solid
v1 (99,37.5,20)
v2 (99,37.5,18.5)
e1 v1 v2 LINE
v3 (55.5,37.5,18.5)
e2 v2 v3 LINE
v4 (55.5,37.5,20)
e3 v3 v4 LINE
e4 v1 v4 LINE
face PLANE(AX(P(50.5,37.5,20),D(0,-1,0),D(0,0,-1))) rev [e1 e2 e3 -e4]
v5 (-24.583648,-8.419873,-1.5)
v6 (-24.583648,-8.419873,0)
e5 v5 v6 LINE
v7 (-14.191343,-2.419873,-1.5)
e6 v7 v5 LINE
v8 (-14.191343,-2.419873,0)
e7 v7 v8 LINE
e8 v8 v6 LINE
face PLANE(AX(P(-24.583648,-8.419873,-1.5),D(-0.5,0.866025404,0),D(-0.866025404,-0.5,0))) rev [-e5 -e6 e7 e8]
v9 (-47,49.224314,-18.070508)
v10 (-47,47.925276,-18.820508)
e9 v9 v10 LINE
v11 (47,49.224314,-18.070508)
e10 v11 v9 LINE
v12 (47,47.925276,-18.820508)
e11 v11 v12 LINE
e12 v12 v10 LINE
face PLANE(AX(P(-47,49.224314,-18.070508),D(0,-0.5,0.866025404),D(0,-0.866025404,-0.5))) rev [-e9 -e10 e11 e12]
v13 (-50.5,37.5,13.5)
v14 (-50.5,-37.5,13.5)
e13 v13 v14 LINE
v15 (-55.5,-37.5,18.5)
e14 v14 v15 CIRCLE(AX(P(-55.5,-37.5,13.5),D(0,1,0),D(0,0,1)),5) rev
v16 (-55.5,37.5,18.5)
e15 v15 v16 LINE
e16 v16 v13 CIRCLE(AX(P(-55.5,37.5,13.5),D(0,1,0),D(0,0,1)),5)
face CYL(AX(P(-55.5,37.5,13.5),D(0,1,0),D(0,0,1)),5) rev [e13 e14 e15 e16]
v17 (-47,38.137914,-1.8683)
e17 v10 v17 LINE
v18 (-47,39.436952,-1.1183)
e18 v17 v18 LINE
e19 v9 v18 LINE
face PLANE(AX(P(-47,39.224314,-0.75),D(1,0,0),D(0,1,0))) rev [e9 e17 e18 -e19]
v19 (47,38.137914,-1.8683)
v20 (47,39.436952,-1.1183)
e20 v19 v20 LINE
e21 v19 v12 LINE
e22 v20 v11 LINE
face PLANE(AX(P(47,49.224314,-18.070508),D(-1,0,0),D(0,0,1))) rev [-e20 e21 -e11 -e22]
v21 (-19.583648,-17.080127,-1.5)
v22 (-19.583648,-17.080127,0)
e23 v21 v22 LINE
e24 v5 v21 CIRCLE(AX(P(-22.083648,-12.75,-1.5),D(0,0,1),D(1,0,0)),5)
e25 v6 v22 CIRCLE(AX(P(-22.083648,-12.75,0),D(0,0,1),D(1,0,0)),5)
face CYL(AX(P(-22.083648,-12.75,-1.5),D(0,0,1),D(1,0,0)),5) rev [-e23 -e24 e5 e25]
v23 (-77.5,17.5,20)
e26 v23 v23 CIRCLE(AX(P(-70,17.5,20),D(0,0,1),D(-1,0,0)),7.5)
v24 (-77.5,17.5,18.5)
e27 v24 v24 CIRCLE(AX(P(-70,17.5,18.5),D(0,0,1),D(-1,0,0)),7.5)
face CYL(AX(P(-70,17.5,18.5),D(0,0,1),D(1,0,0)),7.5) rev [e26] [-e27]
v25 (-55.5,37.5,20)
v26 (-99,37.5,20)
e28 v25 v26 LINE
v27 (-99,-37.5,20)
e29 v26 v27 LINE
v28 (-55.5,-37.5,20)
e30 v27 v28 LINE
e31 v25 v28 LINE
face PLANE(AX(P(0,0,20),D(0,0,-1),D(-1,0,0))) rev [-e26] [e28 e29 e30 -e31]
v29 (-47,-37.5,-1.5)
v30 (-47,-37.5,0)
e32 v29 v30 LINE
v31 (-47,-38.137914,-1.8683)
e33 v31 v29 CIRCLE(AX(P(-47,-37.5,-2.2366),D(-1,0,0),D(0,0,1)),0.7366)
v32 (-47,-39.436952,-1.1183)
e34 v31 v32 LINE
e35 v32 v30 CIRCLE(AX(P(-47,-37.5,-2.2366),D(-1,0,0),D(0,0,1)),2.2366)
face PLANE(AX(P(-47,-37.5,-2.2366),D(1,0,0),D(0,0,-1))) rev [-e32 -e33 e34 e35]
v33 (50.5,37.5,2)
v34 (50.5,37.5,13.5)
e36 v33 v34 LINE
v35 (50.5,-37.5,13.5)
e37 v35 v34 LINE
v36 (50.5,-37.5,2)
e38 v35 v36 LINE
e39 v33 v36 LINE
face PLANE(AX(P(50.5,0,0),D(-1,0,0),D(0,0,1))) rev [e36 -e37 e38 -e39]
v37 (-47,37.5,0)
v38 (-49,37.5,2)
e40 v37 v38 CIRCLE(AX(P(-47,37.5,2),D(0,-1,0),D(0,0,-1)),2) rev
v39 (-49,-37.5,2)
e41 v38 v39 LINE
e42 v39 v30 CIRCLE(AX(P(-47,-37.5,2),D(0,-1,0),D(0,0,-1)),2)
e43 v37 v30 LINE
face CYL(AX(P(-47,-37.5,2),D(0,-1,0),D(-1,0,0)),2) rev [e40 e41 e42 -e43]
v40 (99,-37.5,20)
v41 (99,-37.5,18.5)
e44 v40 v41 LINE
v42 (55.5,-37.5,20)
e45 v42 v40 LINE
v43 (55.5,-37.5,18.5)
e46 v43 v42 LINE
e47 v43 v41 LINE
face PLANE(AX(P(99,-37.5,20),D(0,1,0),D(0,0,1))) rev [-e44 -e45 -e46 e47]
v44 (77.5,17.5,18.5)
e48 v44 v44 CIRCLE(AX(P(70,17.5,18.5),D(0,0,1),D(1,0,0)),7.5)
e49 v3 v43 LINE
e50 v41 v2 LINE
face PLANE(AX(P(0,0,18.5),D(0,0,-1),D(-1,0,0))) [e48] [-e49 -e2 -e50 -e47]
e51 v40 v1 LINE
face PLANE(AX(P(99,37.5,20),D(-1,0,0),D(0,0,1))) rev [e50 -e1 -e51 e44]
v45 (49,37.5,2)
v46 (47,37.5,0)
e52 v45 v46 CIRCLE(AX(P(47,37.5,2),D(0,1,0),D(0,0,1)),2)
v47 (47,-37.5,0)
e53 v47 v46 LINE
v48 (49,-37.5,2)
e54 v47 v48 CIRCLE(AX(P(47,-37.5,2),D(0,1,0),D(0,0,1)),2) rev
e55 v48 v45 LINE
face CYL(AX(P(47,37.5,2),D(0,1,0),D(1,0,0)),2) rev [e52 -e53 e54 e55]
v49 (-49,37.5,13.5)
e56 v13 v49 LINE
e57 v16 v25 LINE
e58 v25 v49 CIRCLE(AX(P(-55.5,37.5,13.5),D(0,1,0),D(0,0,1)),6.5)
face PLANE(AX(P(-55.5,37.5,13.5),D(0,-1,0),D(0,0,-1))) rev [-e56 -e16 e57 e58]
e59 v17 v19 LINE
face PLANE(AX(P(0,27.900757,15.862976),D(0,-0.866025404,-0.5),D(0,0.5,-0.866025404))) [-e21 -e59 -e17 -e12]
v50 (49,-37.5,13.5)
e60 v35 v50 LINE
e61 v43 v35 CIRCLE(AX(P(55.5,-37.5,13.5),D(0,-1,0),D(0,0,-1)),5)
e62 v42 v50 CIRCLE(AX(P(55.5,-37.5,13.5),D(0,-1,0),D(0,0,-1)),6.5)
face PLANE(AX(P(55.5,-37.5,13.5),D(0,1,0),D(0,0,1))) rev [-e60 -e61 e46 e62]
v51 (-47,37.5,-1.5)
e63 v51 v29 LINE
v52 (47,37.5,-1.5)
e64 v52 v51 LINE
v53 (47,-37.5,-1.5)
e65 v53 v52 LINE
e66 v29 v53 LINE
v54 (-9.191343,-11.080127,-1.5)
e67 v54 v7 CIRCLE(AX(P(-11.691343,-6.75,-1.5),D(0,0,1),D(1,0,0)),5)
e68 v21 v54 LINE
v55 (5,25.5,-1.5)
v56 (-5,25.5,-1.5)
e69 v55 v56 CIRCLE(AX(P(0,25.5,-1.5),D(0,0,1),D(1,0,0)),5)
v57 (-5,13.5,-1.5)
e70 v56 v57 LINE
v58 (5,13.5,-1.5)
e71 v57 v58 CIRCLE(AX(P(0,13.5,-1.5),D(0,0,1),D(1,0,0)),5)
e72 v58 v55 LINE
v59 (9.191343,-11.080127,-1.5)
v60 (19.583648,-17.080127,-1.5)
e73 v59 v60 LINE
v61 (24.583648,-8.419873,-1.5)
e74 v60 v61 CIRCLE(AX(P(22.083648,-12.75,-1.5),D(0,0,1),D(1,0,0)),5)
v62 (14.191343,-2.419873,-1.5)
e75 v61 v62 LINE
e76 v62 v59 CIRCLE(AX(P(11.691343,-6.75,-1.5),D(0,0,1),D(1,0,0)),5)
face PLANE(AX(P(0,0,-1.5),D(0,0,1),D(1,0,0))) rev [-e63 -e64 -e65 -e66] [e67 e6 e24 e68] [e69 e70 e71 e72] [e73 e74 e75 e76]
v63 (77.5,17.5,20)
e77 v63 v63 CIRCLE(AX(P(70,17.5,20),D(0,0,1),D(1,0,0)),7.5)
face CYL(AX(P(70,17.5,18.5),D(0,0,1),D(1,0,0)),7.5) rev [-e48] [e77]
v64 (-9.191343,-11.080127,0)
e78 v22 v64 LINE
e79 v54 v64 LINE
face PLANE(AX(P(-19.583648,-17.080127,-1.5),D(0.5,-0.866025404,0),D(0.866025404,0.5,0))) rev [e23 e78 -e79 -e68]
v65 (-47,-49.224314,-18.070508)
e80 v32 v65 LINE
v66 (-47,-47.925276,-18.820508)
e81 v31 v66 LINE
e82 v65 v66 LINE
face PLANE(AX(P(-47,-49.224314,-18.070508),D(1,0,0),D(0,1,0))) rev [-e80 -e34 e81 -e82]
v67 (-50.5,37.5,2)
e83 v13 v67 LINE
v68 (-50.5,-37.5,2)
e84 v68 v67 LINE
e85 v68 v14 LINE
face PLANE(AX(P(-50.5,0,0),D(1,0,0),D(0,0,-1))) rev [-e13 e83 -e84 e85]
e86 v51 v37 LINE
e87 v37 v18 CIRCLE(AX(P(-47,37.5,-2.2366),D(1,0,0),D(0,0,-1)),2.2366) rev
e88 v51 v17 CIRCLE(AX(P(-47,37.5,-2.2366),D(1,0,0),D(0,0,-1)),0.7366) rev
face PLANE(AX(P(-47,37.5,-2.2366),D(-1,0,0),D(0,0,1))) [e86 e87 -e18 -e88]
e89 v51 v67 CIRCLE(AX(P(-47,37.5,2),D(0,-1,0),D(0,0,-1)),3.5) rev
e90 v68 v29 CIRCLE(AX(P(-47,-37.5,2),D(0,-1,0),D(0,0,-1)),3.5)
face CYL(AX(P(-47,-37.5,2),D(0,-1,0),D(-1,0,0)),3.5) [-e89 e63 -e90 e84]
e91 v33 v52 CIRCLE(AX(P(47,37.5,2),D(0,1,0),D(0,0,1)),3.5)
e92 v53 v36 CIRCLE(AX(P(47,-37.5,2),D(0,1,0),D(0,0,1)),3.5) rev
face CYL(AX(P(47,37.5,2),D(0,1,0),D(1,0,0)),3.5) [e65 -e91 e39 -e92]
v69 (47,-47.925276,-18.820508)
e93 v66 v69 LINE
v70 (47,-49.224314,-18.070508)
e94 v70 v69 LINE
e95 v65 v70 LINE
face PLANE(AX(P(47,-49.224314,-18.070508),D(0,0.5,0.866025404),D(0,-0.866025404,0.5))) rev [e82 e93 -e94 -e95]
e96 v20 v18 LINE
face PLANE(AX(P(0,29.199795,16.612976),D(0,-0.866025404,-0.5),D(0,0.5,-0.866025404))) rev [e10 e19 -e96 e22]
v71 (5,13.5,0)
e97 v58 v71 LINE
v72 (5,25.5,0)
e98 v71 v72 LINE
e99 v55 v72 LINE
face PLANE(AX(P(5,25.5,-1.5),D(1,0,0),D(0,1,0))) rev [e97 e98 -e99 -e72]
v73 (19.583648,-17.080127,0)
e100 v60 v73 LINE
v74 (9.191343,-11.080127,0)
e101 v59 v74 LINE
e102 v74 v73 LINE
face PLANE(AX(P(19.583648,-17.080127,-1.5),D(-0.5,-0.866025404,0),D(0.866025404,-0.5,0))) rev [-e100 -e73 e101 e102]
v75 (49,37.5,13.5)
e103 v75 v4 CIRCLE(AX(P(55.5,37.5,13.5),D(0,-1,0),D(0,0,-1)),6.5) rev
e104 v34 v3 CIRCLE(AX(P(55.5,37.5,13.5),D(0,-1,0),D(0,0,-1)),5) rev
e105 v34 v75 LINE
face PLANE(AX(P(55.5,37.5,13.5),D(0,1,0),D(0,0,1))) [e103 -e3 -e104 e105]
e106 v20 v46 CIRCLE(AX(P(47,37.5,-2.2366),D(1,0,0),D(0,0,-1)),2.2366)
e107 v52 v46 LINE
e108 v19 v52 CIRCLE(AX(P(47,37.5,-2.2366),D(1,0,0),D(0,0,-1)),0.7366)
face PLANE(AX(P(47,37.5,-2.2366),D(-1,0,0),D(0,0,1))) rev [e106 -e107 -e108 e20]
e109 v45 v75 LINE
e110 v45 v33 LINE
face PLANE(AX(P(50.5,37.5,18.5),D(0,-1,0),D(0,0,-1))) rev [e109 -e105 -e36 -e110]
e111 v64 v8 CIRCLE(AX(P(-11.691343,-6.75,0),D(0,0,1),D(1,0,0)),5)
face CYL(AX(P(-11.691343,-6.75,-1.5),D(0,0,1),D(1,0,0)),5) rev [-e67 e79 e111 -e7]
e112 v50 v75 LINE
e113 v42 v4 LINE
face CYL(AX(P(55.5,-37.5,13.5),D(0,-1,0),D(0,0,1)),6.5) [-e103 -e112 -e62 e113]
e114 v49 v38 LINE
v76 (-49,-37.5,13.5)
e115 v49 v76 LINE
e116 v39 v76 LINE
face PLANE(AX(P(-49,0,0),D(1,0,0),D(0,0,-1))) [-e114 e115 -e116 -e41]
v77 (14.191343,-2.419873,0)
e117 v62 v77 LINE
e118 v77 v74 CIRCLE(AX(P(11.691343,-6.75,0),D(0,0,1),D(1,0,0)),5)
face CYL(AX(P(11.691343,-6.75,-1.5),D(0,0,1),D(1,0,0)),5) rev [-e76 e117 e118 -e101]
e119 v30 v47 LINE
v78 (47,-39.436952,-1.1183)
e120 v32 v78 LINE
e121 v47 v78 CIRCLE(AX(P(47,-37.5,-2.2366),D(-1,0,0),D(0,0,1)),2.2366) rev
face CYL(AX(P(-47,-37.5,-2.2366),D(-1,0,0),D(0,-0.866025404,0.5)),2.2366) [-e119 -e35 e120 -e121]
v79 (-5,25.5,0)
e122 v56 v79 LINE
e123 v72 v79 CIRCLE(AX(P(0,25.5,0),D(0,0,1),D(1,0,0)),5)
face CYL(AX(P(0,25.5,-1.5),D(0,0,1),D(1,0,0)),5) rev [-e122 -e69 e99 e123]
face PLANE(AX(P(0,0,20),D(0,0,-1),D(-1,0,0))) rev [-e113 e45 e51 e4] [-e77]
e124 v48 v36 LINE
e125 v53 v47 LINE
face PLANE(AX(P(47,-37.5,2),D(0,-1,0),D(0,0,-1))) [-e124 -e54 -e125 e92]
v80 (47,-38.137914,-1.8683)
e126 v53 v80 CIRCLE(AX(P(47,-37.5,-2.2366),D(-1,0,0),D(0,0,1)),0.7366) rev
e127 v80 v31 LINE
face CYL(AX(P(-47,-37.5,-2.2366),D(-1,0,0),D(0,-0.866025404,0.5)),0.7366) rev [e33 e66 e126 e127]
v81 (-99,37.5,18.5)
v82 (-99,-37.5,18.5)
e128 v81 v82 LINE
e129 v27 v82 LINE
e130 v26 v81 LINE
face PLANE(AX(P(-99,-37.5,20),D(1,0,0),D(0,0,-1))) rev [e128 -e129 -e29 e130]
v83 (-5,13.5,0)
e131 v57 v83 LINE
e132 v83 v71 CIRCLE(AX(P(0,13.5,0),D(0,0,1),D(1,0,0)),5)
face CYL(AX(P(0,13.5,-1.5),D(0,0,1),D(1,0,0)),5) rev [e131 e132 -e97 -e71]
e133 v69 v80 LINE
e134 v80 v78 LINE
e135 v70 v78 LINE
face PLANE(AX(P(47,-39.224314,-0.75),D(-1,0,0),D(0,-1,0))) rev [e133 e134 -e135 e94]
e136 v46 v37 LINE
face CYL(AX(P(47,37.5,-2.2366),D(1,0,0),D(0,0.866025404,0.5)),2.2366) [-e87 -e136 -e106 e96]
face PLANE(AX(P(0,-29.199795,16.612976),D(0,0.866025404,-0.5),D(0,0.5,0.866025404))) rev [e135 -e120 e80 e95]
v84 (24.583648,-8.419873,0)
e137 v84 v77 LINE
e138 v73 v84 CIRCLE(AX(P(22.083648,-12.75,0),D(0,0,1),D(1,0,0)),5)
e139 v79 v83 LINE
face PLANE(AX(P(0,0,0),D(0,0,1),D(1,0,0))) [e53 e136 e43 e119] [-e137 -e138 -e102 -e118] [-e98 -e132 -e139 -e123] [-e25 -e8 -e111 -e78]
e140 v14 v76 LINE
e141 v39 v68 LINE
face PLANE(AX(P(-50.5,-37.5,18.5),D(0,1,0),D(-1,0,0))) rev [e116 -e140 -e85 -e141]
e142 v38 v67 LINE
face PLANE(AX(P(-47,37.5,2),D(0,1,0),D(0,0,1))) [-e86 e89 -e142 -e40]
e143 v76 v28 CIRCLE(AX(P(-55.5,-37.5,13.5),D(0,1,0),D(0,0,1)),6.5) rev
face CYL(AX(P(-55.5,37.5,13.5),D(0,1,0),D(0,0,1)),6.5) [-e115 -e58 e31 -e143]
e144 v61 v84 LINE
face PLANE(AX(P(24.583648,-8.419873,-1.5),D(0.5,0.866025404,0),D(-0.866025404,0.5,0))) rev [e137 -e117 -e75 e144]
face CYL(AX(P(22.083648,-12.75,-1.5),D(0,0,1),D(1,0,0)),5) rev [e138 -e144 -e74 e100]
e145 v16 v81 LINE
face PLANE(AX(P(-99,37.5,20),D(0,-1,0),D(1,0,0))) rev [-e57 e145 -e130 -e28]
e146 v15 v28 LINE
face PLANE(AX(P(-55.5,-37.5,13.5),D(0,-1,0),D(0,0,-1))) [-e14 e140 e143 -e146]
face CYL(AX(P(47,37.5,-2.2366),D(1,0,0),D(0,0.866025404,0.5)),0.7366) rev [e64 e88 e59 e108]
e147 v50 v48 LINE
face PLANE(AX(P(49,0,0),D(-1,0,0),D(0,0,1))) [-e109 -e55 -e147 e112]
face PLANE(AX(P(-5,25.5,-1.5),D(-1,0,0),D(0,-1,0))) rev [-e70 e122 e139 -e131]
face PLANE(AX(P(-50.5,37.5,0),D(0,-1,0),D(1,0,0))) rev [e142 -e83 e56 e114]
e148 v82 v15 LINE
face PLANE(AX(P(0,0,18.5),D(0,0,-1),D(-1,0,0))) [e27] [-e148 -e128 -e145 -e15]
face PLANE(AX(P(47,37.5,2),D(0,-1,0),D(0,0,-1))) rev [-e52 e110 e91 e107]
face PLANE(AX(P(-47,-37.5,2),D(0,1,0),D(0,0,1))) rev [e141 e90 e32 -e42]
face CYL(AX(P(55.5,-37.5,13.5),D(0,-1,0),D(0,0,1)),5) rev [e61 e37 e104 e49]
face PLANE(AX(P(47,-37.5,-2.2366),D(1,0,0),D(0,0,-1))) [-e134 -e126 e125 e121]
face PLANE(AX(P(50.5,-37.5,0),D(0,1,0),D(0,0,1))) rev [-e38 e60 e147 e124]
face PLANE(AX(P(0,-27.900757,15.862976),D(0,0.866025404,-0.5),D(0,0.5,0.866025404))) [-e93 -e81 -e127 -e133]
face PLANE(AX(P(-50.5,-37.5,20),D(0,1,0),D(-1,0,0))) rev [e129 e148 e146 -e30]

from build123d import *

# Parameters (mm, degrees)
SKETCH1_W                    = 94
SKETCH1_H                    = 75
BASE_FLANGE1_DEPTH           = 1.5
EDGE_FLANGE1_DEPTH           = 75
EDGE_FLANGE2_STRIP_W         = 16
EDGE_FLANGE2_STRIP_H         = 1.5
EDGE_FLANGE2_STRIP_CUT_DEPTH = 75
EDGE_FLANGE2_DEPTH           = 75
EDGE_FLANGE3_DEPTH           = 75
EDGE_FLANGE4_STRIP_W         = 16
EDGE_FLANGE4_STRIP_H         = 1.5
EDGE_FLANGE4_STRIP_CUT_DEPTH = 75
EDGE_FLANGE4_DEPTH           = 75
SKETCH18_R                   = 7.5
CUT_EXTRUDE1_DEPTH           = 10
EDGE_FLANGE5_DEPTH           = 94
EDGE_FLANGE6_DEPTH           = 94


# Sheet-metal steps are written as plain solids
with BuildPart() as part:
    # Sketch1 → Base-Flange1 (new body)
    with BuildSketch(Plane.XY):
        Rectangle(SKETCH1_W, SKETCH1_H)
        with BuildLine():
            Line((5, 25.5), (5, 13.5))
            ThreePointArc((5, 13.5), (0, 8.5), (-5, 13.5))
            Line((-5, 13.5), (-5, 25.5))
            ThreePointArc((-5, 25.5), (0, 30.5), (5, 25.5))
        make_face(mode=Mode.SUBTRACT)
        with BuildLine():
            Line((19.583647797, -17.080127019), (9.191342951, -11.080127019))
            ThreePointArc((9.191342951, -11.080127019), (7.361215932, -4.25), (14.191342951, -2.419872981))
            Line((14.191342951, -2.419872981), (24.583647797, -8.419872981))
            ThreePointArc((24.583647797, -8.419872981), (26.413774815, -15.25), (19.583647797, -17.080127019))
        make_face(mode=Mode.SUBTRACT)
        with BuildLine():
            Line((-24.583647797, -8.419872981), (-14.191342951, -2.419872981))
            ThreePointArc((-14.191342951, -2.419872981), (-7.361215932, -4.25), (-9.191342951, -11.080127019))
            Line((-9.191342951, -11.080127019), (-19.583647797, -17.080127019))
            ThreePointArc((-19.583647797, -17.080127019), (-26.413774815, -15.25), (-24.583647797, -8.419872981))
        make_face(mode=Mode.SUBTRACT)
    extrude(amount=-BASE_FLANGE1_DEPTH)

    # Edge-Flange1 section (across the edge) → Edge-Flange1 (add)
    with BuildSketch(Plane(origin=(49, -37.5, 0), x_dir=(-1, 0, 0), z_dir=(0, 1, 0))):
        with BuildLine():
            Line((-1.5, 2), (-1.5, 18.5))
            Line((-1.5, 18.5), (0, 18.5))
            Line((0, 18.5), (0, 2))
            ThreePointArc((0, 2), (0.585786438, 0.585786438), (2, 0))
            Line((2, 0), (2, -1.5))
            ThreePointArc((2, -1.5), (-0.474873734, -0.474873734), (-1.5, 2))
        make_face()
    extrude(amount=EDGE_FLANGE1_DEPTH)

    # Edge-Flange2 strip (across the edge) → Edge-Flange2 strip cut (cut)
    with BuildSketch(Plane(origin=(50.5, 37.5, 18.5), x_dir=(0, 0, -1), z_dir=(0, -1, 0))):
        with Locations((-3, -0.75)):
            Rectangle(EDGE_FLANGE2_STRIP_W, EDGE_FLANGE2_STRIP_H)
    extrude(amount=EDGE_FLANGE2_STRIP_CUT_DEPTH, mode=Mode.SUBTRACT)

    # Edge-Flange2 section (across the edge) → Edge-Flange2 (add)
    with BuildSketch(Plane(origin=(50.5, 37.5, 18.5), x_dir=(0, 0, -1), z_dir=(0, -1, 0))):
        with BuildLine():
            Line((-1.5, 5), (-1.5, 48.5))
            Line((-1.5, 48.5), (0, 48.5))
            Line((0, 48.5), (0, 5))
            ThreePointArc((0, 5), (1.464466094, 1.464466094), (5, 0))
            Line((5, 0), (5, -1.5))
            ThreePointArc((5, -1.5), (0.403805922, 0.403805922), (-1.5, 5))
        make_face()
    extrude(amount=EDGE_FLANGE2_DEPTH)

    # Edge-Flange3 section (across the edge) → Edge-Flange3 (add)
    with BuildSketch(Plane(origin=(-49, 37.5, 0), x_dir=(1, 0, 0), z_dir=(0, -1, 0))):
        with BuildLine():
            Line((-1.5, 2), (-1.5, 18.5))
            Line((-1.5, 18.5), (0, 18.5))
            Line((0, 18.5), (0, 2))
            ThreePointArc((0, 2), (0.585786438, 0.585786438), (2, 0))
            Line((2, 0), (2, -1.5))
            ThreePointArc((2, -1.5), (-0.474873734, -0.474873734), (-1.5, 2))
        make_face()
    extrude(amount=EDGE_FLANGE3_DEPTH)

    # Edge-Flange4 strip (across the edge) → Edge-Flange4 strip cut (cut)
    with BuildSketch(Plane(origin=(-50.5, -37.5, 18.5), x_dir=(0, 0, -1), z_dir=(0, 1, 0))):
        with Locations((-3, -0.75)):
            Rectangle(EDGE_FLANGE4_STRIP_W, EDGE_FLANGE4_STRIP_H)
    extrude(amount=EDGE_FLANGE4_STRIP_CUT_DEPTH, mode=Mode.SUBTRACT)

    # Edge-Flange4 section (across the edge) → Edge-Flange4 (add)
    with BuildSketch(Plane(origin=(-50.5, -37.5, 18.5), x_dir=(0, 0, -1), z_dir=(0, 1, 0))):
        with BuildLine():
            Line((-1.5, 5), (-1.5, 48.5))
            Line((-1.5, 48.5), (0, 48.5))
            Line((0, 48.5), (0, 5))
            ThreePointArc((0, 5), (1.464466094, 1.464466094), (5, 0))
            Line((5, 0), (5, -1.5))
            ThreePointArc((5, -1.5), (0.403805922, 0.403805922), (-1.5, 5))
        make_face()
    extrude(amount=EDGE_FLANGE4_DEPTH)

    # Sketch18 → Cut-Extrude1 (cut)
    with BuildSketch(Plane.XY.offset(20)):
        with Locations((70, 17.5)):
            Circle(SKETCH18_R)
        with Locations(Location((-70, 17.5, 0), (0, 0, 180))):
            Circle(SKETCH18_R)
    extrude(amount=-CUT_EXTRUDE1_DEPTH, mode=Mode.SUBTRACT)

    # Edge-Flange5 section (across the edge) → Edge-Flange5 (add)
    with BuildSketch(Plane(origin=(-47, 37.925276208, -1.5), x_dir=(0, -0.8660254037844364, -0.5000000000000041), z_dir=(1, 0, 0))):
        with BuildLine():
            Line((-1.5, 0.425276208), (-1.5, 20))
            Line((-1.5, 20), (0, 20))
            Line((0, 20), (0, 0.425276208))
            ThreePointArc((0, 0.425276208), (0.098685688, 0.056976208), (0.3683, -0.212638104))
            Line((0.3683, -0.212638104), (-0.3817, -1.51167621))
            ThreePointArc((-0.3817, -1.51167621), (-1.200352418, -0.693023792), (-1.5, 0.425276208))
        make_face()
    extrude(amount=EDGE_FLANGE5_DEPTH)

    # Edge-Flange6 section (across the edge) → Edge-Flange6 (add)
    with BuildSketch(Plane(origin=(47, -37.925276208, -1.5), x_dir=(0, 0.8660254037844364, -0.5000000000000041), z_dir=(-1, 0, 0))):
        with BuildLine():
            Line((-1.5, 0.425276208), (-1.5, 20))
            Line((-1.5, 20), (0, 20))
            Line((0, 20), (0, 0.425276208))
            ThreePointArc((0, 0.425276208), (0.098685688, 0.056976208), (0.3683, -0.212638104))
            Line((0.3683, -0.212638104), (-0.3817, -1.51167621))
            ThreePointArc((-0.3817, -1.51167621), (-1.200352418, -0.693023792), (-1.5, 0.425276208))
        make_face()
    extrude(amount=EDGE_FLANGE6_DEPTH)


solid = part.part
